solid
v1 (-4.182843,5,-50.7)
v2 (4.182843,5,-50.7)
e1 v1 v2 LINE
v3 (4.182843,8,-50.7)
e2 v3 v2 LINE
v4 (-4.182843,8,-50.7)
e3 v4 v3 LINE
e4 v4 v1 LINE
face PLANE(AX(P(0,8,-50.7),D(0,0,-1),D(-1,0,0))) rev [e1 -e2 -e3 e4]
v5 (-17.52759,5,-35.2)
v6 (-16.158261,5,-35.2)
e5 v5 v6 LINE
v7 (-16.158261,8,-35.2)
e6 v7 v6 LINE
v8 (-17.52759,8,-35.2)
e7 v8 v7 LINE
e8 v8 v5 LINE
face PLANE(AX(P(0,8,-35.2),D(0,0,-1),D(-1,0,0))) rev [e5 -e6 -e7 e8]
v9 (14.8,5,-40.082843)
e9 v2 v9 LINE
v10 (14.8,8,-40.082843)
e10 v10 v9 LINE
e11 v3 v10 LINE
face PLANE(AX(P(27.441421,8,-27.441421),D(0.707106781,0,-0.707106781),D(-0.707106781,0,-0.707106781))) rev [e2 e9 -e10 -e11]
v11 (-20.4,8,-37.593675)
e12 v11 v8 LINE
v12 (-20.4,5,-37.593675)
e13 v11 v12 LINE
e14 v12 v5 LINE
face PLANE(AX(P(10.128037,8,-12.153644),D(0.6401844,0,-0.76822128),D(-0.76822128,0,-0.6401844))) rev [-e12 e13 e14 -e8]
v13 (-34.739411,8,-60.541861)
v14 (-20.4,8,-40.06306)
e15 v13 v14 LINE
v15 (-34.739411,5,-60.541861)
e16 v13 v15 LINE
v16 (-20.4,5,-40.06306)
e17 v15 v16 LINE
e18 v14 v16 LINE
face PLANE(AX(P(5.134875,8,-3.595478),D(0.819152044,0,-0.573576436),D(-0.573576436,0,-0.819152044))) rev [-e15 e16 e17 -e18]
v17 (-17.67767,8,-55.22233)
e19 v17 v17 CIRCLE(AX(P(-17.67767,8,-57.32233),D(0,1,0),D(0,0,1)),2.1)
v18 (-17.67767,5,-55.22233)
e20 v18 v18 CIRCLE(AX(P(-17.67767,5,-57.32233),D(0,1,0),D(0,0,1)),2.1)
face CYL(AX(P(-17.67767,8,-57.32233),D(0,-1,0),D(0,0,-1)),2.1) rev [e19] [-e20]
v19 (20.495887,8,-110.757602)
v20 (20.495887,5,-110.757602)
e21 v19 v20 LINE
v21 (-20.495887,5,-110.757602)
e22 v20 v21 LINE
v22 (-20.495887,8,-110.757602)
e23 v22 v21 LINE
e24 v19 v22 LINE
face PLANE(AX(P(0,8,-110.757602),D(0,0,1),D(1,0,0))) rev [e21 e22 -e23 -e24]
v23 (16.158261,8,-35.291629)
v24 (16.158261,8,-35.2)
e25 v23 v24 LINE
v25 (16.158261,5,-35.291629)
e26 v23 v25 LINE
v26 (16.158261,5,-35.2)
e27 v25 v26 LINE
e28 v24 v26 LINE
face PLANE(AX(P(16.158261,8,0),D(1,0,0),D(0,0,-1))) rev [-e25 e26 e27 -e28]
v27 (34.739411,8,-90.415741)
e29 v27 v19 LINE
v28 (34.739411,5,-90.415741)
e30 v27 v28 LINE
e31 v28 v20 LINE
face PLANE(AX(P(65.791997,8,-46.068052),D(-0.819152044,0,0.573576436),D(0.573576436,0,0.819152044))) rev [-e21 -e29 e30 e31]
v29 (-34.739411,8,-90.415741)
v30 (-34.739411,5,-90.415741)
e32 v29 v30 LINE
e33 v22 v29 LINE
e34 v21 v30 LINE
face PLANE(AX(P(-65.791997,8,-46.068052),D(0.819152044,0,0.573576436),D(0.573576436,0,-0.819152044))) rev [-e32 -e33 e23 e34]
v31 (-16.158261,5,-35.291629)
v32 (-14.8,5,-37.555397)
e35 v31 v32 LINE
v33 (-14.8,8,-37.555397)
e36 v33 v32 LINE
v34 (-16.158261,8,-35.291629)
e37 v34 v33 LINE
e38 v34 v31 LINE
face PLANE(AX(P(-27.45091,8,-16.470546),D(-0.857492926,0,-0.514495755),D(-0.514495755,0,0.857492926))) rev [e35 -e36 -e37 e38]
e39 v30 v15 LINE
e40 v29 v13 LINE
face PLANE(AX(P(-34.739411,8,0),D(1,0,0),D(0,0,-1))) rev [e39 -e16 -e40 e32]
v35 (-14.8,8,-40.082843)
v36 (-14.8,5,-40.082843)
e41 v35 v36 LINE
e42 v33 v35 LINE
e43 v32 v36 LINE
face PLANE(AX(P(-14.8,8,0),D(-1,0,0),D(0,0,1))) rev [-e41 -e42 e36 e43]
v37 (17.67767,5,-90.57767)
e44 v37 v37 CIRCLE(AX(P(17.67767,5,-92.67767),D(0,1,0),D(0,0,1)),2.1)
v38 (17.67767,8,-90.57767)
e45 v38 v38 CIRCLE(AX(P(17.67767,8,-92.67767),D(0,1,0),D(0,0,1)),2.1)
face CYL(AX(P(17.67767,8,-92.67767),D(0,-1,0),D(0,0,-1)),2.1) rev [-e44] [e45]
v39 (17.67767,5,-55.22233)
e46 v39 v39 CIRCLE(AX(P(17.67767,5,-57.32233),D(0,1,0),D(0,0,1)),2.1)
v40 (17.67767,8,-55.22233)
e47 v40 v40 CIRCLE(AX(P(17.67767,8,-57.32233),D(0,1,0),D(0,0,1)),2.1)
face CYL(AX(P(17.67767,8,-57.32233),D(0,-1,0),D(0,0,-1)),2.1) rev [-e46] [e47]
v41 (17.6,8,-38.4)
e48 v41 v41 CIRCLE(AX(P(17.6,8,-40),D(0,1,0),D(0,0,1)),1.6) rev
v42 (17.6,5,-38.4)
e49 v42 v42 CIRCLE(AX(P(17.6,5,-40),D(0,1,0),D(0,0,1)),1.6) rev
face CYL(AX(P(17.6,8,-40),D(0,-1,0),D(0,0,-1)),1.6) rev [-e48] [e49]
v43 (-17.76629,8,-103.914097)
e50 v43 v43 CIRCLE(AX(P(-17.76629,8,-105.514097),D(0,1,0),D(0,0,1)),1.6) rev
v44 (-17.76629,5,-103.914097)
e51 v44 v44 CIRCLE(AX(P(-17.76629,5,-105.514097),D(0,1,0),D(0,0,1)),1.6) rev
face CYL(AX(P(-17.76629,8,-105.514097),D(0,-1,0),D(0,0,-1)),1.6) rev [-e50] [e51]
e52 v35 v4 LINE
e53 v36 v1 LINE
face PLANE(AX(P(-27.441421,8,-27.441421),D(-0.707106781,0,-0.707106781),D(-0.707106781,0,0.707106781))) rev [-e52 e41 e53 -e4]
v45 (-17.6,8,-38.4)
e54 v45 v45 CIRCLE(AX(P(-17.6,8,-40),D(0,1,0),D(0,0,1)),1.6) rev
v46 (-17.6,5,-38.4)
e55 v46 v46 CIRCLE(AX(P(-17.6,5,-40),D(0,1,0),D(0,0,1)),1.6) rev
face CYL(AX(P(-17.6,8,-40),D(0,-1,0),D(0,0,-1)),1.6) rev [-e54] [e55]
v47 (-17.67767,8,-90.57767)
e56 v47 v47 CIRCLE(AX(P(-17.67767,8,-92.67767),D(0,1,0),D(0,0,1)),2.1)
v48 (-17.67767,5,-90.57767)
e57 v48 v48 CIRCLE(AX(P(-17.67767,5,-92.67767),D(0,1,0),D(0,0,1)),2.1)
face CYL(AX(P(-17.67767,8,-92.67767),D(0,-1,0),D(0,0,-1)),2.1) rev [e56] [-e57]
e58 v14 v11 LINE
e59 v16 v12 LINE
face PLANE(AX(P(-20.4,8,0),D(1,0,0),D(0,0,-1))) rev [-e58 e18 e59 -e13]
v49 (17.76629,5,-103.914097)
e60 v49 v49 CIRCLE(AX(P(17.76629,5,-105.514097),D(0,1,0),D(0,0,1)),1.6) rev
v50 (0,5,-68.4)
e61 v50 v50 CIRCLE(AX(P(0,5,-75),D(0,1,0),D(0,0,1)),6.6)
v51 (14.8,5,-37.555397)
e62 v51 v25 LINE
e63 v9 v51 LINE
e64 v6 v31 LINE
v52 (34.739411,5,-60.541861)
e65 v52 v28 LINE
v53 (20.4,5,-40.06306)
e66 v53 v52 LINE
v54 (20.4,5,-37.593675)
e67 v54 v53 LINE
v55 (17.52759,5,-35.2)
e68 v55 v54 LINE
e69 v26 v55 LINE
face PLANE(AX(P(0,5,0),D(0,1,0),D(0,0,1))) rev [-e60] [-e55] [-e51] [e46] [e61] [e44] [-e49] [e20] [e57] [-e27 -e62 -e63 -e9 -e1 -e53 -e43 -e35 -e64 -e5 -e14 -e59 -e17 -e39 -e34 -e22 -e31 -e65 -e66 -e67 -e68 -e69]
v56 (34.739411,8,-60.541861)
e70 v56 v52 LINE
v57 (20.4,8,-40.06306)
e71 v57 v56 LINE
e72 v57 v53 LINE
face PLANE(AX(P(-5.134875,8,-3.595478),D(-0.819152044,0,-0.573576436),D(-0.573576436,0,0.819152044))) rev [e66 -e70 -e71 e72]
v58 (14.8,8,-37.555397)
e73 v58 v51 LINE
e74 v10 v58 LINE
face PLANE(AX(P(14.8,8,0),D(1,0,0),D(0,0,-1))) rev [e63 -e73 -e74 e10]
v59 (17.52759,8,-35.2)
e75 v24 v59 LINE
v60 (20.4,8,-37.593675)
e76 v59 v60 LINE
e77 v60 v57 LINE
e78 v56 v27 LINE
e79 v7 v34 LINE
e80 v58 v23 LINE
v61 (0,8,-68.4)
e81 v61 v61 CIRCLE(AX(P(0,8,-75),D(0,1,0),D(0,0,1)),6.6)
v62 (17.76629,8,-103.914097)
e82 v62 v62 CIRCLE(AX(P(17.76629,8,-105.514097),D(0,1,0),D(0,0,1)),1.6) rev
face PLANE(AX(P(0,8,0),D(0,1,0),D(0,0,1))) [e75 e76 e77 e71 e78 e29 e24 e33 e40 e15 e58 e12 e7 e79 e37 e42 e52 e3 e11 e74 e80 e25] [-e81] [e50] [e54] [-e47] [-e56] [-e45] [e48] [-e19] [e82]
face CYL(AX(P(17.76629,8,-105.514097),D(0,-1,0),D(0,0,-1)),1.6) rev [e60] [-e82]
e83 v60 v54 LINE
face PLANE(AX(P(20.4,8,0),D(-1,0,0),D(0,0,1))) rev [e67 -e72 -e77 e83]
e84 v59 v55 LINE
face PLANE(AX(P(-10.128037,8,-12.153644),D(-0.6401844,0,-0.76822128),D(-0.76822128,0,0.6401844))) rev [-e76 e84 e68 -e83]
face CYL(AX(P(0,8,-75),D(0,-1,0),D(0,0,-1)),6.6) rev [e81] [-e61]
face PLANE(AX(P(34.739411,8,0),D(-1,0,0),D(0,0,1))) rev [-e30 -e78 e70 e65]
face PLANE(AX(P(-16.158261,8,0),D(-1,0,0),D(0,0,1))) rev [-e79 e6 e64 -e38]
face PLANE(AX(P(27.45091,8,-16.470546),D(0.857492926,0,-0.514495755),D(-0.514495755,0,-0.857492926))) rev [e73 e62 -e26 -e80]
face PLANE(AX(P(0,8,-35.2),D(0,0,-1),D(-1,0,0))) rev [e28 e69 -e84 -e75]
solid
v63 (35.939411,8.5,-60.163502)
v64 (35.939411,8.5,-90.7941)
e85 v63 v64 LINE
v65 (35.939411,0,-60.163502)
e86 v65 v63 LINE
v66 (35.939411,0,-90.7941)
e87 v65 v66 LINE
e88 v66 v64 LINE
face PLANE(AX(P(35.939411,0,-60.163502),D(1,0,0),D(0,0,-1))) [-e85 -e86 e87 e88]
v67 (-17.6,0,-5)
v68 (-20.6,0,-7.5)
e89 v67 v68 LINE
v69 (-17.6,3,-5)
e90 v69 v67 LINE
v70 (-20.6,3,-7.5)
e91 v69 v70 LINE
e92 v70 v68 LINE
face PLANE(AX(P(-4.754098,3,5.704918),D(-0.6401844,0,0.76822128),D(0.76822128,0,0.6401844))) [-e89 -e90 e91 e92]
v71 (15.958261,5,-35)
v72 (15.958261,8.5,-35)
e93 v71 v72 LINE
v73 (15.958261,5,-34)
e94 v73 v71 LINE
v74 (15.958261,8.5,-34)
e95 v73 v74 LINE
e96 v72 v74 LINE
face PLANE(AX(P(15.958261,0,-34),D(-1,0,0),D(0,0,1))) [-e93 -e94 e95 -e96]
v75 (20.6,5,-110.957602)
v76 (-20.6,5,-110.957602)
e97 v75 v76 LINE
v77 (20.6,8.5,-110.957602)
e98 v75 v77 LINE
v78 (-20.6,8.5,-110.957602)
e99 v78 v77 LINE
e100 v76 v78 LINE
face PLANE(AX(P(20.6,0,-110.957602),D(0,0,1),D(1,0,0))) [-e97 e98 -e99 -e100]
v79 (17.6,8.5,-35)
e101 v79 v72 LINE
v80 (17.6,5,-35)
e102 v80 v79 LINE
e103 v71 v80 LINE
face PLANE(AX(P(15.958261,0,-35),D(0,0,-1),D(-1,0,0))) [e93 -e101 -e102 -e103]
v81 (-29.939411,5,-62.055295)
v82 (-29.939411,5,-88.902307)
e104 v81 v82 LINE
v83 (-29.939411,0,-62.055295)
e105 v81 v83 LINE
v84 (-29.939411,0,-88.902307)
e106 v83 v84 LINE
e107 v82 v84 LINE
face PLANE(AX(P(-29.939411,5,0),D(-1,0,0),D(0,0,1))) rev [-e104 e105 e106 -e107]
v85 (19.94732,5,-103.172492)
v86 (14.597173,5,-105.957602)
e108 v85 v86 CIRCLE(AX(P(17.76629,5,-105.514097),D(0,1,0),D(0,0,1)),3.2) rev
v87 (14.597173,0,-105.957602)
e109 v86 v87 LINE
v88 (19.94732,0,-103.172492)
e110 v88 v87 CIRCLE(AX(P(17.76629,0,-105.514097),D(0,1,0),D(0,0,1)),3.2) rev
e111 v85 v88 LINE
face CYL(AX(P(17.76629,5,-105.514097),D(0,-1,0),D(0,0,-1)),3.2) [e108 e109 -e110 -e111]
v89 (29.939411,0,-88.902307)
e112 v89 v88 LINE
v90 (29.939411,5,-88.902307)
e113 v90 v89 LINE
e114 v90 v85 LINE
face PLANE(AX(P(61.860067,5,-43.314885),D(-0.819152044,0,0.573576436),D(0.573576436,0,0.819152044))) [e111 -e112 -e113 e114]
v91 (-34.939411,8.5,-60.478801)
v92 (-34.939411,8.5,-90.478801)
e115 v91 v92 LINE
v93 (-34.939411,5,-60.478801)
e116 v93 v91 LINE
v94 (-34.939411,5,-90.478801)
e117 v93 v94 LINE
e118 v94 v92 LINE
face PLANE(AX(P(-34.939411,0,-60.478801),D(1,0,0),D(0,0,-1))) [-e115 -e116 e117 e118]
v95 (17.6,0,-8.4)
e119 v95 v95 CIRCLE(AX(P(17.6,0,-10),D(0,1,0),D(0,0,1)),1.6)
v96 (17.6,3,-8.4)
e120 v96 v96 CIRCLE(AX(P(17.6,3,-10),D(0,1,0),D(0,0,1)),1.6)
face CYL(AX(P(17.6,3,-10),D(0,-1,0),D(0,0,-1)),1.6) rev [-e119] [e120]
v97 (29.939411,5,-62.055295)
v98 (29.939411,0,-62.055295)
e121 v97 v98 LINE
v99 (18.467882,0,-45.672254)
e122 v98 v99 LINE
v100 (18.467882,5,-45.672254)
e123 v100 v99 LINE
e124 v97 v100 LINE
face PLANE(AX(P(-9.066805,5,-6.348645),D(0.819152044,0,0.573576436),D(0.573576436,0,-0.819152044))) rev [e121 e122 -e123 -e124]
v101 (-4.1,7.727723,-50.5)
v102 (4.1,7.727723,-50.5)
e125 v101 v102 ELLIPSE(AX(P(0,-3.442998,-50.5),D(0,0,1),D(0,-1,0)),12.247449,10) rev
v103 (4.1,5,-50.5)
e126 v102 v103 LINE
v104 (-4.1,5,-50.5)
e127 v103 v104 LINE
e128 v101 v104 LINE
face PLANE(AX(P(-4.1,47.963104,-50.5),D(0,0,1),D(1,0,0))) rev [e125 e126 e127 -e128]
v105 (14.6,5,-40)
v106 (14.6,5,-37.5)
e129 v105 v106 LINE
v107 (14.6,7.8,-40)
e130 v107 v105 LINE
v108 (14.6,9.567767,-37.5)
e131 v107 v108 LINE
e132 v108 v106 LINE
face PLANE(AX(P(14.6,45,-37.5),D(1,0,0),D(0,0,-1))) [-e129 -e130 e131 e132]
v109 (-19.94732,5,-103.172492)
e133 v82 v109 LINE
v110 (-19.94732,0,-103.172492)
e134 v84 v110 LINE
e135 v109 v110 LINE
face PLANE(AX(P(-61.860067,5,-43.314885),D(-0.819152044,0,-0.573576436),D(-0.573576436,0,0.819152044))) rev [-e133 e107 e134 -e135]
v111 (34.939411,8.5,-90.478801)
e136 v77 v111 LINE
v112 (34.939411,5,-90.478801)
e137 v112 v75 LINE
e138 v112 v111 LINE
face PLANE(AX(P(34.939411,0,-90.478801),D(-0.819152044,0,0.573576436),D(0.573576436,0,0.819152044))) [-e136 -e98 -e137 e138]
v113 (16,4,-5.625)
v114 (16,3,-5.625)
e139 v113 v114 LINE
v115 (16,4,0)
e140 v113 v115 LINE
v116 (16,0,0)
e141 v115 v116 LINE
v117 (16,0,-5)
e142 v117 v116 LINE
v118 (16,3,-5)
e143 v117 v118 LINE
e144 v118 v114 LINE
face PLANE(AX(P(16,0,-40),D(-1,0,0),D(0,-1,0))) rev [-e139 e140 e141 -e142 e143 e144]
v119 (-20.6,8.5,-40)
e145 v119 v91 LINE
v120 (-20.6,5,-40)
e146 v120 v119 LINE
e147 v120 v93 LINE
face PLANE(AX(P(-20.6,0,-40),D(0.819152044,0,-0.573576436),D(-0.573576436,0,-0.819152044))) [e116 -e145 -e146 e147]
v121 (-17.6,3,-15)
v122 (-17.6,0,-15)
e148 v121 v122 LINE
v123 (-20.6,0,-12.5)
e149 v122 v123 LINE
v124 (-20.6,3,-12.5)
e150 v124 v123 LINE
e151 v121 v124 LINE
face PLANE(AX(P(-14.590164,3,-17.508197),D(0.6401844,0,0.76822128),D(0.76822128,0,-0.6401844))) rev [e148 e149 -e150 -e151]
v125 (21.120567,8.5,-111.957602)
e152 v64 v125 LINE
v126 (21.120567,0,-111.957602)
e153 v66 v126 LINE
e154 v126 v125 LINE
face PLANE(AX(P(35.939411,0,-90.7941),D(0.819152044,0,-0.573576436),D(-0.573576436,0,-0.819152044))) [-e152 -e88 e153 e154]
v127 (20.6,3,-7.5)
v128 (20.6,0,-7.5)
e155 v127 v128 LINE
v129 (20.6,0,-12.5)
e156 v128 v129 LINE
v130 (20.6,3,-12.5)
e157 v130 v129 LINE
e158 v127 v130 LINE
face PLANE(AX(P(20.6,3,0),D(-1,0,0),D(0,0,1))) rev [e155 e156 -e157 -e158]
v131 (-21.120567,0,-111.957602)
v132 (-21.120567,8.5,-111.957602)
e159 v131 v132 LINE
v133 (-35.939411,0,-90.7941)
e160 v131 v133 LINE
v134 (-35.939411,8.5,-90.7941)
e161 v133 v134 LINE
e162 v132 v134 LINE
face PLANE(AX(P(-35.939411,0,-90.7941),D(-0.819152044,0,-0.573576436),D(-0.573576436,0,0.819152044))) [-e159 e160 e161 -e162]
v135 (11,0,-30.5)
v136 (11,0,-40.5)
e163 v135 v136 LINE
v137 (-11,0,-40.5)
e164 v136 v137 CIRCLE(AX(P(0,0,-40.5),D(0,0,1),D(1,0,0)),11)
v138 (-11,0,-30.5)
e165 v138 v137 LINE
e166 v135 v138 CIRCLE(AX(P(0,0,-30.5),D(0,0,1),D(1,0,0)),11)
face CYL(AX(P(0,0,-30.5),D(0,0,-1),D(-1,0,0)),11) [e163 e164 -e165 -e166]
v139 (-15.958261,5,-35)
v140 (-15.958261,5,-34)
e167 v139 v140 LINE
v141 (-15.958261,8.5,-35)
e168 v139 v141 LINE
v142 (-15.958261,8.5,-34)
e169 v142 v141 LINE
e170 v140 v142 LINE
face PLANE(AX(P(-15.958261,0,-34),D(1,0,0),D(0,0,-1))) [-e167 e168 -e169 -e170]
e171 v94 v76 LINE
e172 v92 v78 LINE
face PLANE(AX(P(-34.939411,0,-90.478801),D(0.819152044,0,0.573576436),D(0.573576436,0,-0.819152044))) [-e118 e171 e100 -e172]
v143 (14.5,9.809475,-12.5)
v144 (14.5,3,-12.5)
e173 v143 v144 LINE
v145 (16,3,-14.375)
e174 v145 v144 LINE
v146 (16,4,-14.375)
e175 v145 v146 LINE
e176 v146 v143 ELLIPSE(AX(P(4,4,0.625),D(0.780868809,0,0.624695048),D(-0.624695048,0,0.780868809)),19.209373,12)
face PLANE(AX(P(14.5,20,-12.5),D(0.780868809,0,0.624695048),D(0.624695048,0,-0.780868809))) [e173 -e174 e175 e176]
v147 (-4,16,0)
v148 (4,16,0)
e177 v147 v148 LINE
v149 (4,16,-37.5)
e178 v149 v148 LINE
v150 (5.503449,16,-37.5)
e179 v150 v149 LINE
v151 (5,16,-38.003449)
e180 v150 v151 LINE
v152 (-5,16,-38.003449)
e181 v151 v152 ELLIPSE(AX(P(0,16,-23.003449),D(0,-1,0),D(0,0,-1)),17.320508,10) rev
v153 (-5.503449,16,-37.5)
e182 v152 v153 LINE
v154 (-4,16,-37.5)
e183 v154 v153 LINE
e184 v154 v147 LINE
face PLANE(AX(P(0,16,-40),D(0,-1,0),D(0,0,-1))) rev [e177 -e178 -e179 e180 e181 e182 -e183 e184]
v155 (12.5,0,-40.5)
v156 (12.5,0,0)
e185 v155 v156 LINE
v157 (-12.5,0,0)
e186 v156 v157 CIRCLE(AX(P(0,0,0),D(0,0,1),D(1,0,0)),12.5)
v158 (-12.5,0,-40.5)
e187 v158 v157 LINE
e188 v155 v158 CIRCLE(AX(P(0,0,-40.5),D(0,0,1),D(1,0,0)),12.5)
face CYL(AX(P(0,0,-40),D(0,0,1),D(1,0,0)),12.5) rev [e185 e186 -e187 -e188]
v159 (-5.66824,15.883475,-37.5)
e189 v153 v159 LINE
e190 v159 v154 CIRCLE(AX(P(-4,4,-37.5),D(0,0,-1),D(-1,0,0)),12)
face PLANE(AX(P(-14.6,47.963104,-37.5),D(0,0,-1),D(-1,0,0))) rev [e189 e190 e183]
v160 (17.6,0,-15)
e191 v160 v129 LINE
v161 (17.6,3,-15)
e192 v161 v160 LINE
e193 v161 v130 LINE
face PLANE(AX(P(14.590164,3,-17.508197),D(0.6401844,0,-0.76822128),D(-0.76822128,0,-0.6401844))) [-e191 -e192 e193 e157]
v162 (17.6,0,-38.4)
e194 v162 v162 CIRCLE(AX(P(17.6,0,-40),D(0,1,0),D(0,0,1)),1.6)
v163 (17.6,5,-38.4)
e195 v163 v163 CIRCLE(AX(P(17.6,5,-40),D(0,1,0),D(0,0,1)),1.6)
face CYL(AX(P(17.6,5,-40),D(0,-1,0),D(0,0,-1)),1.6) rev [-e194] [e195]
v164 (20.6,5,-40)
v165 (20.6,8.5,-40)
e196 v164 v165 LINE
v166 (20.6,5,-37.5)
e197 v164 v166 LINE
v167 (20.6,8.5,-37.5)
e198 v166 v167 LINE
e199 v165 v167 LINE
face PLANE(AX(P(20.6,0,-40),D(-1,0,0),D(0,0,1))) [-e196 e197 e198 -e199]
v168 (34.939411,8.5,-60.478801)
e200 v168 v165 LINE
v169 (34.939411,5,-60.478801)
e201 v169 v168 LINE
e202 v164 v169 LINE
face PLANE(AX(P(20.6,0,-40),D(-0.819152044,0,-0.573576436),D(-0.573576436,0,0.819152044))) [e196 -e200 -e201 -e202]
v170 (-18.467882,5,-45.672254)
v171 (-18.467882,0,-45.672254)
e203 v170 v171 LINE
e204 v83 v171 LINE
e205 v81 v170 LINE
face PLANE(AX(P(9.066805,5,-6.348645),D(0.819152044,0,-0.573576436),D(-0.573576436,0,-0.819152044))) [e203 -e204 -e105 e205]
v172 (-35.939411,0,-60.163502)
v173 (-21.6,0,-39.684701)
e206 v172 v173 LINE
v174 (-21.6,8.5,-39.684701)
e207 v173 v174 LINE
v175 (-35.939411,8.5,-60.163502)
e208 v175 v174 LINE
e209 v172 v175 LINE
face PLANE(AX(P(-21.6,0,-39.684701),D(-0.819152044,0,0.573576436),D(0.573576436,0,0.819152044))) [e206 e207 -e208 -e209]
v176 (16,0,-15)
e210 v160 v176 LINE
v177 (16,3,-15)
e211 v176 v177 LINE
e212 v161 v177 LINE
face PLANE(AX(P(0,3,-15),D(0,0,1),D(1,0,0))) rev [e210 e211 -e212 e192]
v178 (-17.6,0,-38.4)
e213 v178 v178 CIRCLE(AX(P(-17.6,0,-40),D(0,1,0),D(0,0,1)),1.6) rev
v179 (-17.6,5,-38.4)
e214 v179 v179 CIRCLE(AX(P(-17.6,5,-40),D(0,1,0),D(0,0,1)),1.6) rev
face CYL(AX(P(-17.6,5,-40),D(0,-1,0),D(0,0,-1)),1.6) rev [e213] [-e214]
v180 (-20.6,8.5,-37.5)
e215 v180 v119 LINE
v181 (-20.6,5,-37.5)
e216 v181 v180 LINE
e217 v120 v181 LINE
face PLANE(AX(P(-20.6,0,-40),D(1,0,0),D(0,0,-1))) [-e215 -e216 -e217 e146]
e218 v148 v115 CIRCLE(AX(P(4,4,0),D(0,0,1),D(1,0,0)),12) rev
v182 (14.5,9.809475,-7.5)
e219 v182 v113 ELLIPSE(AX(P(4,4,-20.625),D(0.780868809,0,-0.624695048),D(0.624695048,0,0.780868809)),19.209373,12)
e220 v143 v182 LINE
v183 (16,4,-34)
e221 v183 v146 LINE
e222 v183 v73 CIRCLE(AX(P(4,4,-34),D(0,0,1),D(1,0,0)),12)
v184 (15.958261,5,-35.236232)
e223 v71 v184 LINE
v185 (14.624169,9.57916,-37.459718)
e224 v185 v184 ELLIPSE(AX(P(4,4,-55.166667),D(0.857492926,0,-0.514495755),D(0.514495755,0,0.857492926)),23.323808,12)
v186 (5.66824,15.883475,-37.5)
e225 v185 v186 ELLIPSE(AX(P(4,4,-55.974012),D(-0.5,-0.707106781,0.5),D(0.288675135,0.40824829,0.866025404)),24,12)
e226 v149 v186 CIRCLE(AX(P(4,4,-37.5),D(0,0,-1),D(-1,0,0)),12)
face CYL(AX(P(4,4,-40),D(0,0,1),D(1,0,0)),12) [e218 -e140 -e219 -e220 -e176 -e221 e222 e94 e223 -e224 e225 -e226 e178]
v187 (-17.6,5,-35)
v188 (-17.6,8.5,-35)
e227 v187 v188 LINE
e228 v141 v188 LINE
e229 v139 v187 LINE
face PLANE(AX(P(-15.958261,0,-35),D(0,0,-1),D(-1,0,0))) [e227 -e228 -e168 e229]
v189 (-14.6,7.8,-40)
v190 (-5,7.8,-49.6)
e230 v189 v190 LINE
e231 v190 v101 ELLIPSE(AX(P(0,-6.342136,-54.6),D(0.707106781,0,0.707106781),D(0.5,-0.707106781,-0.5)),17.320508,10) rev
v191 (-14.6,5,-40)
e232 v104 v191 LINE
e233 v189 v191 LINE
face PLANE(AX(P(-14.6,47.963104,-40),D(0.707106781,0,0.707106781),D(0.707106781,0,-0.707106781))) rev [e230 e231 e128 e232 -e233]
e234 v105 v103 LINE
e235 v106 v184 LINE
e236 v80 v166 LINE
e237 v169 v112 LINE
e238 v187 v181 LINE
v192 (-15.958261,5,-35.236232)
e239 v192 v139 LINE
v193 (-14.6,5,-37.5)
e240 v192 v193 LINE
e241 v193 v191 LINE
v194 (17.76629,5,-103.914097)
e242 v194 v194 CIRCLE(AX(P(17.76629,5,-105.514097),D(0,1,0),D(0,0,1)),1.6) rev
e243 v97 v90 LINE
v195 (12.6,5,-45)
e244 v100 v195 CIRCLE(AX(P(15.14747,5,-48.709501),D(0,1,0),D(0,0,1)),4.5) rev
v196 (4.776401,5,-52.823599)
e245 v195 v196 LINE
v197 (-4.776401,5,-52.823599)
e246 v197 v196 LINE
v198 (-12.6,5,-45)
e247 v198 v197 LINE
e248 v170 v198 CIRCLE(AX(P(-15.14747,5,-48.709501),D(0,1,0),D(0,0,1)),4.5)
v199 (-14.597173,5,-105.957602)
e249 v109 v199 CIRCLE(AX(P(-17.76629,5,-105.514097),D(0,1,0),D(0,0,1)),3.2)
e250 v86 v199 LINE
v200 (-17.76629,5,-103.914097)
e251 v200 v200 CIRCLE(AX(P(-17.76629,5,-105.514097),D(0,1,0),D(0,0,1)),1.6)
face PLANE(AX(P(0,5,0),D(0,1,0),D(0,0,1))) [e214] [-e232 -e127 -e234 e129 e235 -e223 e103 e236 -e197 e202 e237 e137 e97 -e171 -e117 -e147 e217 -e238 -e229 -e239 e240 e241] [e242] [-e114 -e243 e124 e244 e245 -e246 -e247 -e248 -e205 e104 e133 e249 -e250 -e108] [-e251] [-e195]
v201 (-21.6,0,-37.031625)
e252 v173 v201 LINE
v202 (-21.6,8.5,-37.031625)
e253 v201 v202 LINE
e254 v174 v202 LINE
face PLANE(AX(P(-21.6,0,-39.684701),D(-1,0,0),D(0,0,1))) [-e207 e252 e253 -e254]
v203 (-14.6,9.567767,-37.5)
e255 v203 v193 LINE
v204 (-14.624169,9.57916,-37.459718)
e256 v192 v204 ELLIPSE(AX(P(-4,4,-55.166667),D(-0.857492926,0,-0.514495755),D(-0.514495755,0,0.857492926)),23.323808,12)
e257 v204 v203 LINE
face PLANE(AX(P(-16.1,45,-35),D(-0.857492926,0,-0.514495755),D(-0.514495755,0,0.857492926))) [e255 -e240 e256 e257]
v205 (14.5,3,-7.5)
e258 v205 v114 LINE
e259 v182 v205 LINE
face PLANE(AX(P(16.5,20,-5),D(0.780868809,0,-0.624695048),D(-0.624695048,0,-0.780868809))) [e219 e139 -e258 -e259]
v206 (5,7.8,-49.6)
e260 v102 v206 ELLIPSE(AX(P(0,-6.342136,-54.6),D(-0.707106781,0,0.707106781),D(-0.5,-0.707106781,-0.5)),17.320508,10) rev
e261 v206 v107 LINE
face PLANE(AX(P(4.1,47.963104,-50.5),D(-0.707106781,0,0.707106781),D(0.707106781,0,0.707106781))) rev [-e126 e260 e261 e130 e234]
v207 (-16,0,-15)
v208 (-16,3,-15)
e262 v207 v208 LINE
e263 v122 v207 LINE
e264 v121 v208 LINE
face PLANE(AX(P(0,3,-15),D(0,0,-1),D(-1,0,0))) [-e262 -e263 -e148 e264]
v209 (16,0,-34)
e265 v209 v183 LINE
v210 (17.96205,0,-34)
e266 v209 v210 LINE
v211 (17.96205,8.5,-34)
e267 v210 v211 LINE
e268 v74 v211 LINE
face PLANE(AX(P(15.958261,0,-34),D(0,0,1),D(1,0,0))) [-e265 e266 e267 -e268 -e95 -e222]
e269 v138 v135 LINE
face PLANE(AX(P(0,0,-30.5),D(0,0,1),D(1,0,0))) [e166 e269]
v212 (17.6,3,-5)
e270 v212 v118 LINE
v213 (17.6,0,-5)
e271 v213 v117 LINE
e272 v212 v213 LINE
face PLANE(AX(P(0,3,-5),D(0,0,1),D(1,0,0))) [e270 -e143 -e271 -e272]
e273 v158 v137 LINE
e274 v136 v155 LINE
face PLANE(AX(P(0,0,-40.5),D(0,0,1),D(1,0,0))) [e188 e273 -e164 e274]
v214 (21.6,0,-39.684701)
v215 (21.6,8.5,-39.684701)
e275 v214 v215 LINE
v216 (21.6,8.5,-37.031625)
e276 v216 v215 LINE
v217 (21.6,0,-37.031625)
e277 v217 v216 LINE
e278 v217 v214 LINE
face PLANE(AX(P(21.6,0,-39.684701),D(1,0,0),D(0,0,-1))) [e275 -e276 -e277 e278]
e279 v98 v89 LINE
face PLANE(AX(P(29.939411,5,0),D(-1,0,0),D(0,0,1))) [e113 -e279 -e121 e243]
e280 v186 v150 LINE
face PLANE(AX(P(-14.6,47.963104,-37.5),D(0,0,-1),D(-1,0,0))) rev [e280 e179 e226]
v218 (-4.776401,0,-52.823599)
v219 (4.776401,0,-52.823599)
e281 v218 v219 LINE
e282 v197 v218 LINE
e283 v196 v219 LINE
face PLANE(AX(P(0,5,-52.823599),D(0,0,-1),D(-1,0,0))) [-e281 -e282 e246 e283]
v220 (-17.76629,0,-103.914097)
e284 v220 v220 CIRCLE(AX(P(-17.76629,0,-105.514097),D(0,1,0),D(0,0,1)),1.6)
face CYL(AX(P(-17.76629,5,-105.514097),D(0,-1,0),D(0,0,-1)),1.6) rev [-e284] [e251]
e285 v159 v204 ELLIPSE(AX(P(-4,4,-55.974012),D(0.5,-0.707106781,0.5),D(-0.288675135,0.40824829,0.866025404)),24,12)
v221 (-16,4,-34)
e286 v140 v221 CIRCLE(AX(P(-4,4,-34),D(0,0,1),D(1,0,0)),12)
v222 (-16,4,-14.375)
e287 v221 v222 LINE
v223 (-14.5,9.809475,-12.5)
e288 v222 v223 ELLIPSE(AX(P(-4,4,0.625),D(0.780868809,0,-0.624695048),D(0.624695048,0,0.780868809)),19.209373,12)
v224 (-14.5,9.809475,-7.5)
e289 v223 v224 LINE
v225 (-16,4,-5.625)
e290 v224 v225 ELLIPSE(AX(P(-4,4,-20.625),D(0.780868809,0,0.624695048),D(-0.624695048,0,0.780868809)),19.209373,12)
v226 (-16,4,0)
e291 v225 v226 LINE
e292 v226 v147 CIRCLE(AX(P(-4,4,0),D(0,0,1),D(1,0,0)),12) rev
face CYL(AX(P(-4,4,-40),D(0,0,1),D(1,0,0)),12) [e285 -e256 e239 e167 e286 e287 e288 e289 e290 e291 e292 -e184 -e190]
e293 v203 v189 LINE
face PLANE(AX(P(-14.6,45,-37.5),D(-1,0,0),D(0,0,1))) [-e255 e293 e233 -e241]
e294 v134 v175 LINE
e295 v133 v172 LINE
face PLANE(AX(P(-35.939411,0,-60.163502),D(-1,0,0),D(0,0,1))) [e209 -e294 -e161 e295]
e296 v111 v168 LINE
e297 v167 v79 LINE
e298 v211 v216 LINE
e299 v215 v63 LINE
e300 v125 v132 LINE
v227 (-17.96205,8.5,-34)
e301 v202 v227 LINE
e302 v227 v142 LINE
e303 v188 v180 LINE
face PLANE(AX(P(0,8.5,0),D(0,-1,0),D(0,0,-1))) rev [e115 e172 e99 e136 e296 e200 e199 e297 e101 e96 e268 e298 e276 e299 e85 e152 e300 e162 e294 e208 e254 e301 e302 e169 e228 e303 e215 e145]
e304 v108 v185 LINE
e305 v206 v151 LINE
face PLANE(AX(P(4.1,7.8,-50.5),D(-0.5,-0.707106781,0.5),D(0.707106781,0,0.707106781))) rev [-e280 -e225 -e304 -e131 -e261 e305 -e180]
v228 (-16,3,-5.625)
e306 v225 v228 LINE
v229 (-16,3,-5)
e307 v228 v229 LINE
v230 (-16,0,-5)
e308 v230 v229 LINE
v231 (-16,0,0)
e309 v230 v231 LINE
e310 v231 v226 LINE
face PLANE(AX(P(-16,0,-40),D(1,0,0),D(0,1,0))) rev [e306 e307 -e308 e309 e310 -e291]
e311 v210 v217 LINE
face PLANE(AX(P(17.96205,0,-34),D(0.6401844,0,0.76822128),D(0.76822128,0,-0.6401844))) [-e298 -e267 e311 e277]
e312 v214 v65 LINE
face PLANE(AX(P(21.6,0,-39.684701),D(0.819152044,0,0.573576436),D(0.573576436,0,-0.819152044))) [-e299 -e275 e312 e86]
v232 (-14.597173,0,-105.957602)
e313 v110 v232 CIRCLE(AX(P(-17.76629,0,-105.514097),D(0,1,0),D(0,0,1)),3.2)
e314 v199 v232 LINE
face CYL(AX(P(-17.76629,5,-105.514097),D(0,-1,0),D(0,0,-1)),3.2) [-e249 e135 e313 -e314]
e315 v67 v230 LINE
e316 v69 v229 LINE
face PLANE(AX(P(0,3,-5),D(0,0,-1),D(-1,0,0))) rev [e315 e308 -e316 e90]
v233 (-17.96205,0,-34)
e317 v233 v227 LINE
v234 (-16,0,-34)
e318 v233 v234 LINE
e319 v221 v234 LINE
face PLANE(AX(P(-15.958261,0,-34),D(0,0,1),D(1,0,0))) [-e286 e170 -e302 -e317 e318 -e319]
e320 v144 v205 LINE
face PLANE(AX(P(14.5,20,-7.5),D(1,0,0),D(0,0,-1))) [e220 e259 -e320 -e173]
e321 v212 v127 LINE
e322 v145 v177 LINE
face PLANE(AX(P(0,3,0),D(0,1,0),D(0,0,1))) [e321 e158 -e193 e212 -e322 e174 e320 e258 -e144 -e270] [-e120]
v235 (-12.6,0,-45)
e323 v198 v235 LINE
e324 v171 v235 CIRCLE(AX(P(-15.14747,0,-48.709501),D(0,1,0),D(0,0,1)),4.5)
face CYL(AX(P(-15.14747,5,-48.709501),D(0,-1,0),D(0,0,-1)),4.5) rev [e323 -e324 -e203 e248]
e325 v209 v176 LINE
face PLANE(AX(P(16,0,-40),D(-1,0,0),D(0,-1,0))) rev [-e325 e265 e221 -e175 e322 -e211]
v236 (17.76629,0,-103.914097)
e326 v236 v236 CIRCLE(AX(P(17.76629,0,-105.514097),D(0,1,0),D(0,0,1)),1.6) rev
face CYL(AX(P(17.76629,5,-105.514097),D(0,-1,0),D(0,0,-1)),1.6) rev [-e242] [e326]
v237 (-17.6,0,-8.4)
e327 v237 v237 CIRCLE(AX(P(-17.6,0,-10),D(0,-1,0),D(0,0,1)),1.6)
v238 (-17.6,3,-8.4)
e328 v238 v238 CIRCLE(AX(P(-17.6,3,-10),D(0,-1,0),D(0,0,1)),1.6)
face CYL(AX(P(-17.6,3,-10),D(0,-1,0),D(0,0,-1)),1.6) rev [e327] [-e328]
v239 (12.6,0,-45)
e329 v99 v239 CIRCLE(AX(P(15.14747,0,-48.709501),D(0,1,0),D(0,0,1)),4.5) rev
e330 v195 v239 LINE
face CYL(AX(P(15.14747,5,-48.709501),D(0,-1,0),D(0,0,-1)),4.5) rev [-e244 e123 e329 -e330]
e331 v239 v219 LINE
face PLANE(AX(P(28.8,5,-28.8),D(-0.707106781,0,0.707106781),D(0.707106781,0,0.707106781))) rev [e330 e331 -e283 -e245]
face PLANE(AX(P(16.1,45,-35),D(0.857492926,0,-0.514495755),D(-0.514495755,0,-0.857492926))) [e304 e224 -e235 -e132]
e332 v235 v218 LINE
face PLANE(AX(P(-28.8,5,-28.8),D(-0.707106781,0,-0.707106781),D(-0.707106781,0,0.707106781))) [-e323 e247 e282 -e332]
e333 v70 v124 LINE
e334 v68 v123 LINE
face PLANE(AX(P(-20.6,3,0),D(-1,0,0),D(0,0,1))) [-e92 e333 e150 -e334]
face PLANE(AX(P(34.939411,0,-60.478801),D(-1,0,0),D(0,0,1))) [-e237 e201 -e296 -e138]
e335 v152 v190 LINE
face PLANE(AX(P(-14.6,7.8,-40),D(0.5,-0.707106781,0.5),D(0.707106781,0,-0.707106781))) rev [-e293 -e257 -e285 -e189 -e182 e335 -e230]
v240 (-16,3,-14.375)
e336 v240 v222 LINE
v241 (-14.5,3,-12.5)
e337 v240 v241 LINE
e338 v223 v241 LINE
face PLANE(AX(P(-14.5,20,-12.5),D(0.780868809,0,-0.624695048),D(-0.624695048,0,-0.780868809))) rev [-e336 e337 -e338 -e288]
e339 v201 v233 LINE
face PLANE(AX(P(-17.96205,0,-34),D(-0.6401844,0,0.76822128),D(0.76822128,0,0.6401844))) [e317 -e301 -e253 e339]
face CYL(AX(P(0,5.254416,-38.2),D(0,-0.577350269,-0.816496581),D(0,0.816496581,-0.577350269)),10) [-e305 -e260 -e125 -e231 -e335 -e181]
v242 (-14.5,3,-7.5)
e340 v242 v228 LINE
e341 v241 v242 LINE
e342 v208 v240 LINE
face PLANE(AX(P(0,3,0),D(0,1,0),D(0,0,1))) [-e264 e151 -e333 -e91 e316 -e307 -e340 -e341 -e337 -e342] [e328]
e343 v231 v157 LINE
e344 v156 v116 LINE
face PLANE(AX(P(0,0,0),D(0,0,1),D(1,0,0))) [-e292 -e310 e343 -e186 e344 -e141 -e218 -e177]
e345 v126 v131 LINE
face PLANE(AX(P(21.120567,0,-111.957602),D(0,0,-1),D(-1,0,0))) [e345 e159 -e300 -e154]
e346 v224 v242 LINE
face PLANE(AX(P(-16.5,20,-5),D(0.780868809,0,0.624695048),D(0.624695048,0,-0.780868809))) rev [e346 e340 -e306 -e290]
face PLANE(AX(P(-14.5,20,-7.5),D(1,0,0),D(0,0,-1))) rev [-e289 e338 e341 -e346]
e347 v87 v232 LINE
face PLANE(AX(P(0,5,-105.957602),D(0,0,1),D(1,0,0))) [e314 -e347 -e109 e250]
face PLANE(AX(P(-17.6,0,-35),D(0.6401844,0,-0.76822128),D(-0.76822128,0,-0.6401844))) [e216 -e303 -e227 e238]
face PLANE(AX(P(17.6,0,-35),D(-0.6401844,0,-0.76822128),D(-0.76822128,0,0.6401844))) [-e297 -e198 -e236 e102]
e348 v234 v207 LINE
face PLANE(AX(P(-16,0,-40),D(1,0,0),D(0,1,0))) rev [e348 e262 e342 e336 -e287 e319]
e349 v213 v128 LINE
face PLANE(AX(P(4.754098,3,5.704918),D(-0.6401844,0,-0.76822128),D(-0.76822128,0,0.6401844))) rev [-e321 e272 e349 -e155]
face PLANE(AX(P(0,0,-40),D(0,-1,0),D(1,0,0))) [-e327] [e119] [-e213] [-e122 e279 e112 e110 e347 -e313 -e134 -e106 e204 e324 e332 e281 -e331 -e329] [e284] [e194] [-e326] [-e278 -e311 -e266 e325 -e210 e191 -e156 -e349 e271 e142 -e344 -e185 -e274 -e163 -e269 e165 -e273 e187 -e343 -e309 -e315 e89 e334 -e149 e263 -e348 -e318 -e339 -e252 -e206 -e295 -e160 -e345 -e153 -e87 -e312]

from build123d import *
from build123d.topology import SkipClean

# Parameters (mm, degrees)
BOSS_EXTRUDE1_DEPTH      = 40
BOSS_EXTRUDE3_DEPTH      = 3
CUT_EXTRUDE5_DEPTH       = 17
BOSS_EXTRUDE4_OUTLINE_R  = 1.6
BOSS_EXTRUDE4_DEPTH      = 5
CUT_EXTRUDE7_DEPTH       = 40
BOSS_EXTRUDE5_DEPTH      = 11
CUT_EXTRUDE8_DEPTH       = 3
BOSS_EXTRUDE7_DEPTH      = 3.5
BOSS_EXTRUDE7_DEPTH_BACK = 5
SKETCH13_R               = 1.6
SKETCH13_R_2             = 2.1
SKETCH13_R_3             = 6.6
BOSS_EXTRUDE8_DEPTH      = 3
CHAMFER1_SIZE            = 8.2
FILLET1_R                = 10
BOSS_EXTRUDE9_DEPTH      = 10


# Read off the part's stored shape, not the designer's step: Boss-Extrude4
with BuildPart() as part:
    # Sketch1 → Boss-Extrude1 (new body)
    with BuildSketch(Plane.XY):
        with BuildLine():
            ThreePointArc((-12.5, 0), (0, 12.5), (12.5, 0))
            Line((12.5, 0), (16, 0))
            Line((16, 0), (16, 4))
            ThreePointArc((16, 4), (12.485281374, 12.485281374), (4, 16))
            Line((4, 16), (-4, 16))
            ThreePointArc((-4, 16), (-12.485281374, 12.485281374), (-16, 4))
            Line((-16, 4), (-16, 0))
            Line((-16, 0), (-12.5, 0))
        make_face()
    extrude(amount=-BOSS_EXTRUDE1_DEPTH)

    # Sketch3 → Boss-Extrude3 (add)
    with SkipClean():  # the faces are left unmerged after this step: merging them gives an invalid solid
        with BuildSketch(Plane(origin=(0, 0, 0), x_dir=(1, 0, 0), z_dir=(0, 1, 0))):
            Polygon((16, 10.000000005), (16, 6.333333333), (16, 5), (17.6, 5), (20.6, 7.5), (20.6, 12.5), (17.6, 15), (16, 15), (16, 13.666666667), align=None)
            with BuildLine():
                ThreePointArc((19.2, 10), (17.599999997, 8.4), (16, 10.000000005))
                ThreePointArc((16, 10.000000005), (17.600000003, 11.6), (19.2, 10))
            make_face(mode=Mode.SUBTRACT)
        boss_extrude3 = extrude(amount=BOSS_EXTRUDE3_DEPTH)

    # Sketch5 → Cut-Extrude5 (cut)
    with BuildSketch(Plane(origin=(0, 3, 0), x_dir=(1, 0, 0), z_dir=(0, 1, 0))):
        Polygon((14.5, 7.5), (14.5, 12.5), (16.5, 15), (16.5, 5), align=None)
    cut_extrude5 = extrude(amount=CUT_EXTRUDE5_DEPTH, mode=Mode.SUBTRACT)

    # Boss-Extrude4 outline → Boss-Extrude4 (add)
    with BuildSketch(Plane(origin=(0, 0, 0), x_dir=(1, 0, 0), z_dir=(0, 1, 0))):
        Polygon((17.6, 35), (20.6, 37.5), (20.6, 40), (34.939410909, 60.478801107), (34.939410909, 90.478801107), (20.6, 110.957602214), (-20.6, 110.957602214), (-34.939410909, 90.478801107), (-34.939410909, 60.478801107), (-20.6, 40), (-20.6, 37.5), (-17.6, 35), (-14.6, 35), (-14.6, 40), (-12.6, 40), (-12.6, 37.5), (12.6, 37.5), (12.6, 40), (14.6, 40), (14.6, 35), align=None)
        with BuildLine():
            ThreePointArc((18.467882182, 45.672254166), (15.659662761, 44.238744593), (12.6, 45))
            Line((12.6, 45), (4.77640104, 52.82359896))
            Line((4.77640104, 52.82359896), (-4.77640104, 52.82359896))
            Line((-4.77640104, 52.82359896), (-12.6, 45))
            ThreePointArc((-12.6, 45), (-15.659662761, 44.238744593), (-18.467882182, 45.672254166))
            Line((-18.467882182, 45.672254166), (-29.939410909, 62.055295052))
            Line((-29.939410909, 62.055295052), (-29.939410909, 88.902307163))
            Line((-29.939410909, 88.902307163), (-19.947319679, 103.172492335))
            ThreePointArc((-19.947319679, 103.172492335), (-16.288694878, 102.675662132), (-14.59717338, 105.957602214))
            Line((-14.59717338, 105.957602214), (14.59717338, 105.957602214))
            ThreePointArc((14.59717338, 105.957602214), (16.288694878, 102.675662132), (19.947319679, 103.172492335))
            Line((19.947319679, 103.172492335), (29.939410909, 88.902307163))
            Line((29.939410909, 88.902307163), (29.939410909, 62.055295052))
            Line((29.939410909, 62.055295052), (18.467882182, 45.672254166))
        make_face(mode=Mode.SUBTRACT)
        with Locations((17.766290441, 105.514096798)):
            Circle(BOSS_EXTRUDE4_OUTLINE_R, mode=Mode.SUBTRACT)
        with Locations((-17.766290441, 105.514096798)):
            Circle(BOSS_EXTRUDE4_OUTLINE_R, mode=Mode.SUBTRACT)
        with Locations((17.6, 40)):
            Circle(BOSS_EXTRUDE4_OUTLINE_R, mode=Mode.SUBTRACT)
        with Locations((-17.6, 40)):
            Circle(BOSS_EXTRUDE4_OUTLINE_R, mode=Mode.SUBTRACT)
    extrude(amount=BOSS_EXTRUDE4_DEPTH)

    # Sketch7 → Cut-Extrude7 (cut)
    with BuildSketch(Plane(origin=(0, 5, 0), x_dir=(1, 0, 0), z_dir=(0, 1, 0))):
        Polygon((-16.1, 35), (-14.6, 37.5), (-14.6, 40), (-16.1, 40), align=None)
        Polygon((16.1, 40), (16.1, 35), (14.6, 37.5), (14.6, 40), align=None)
    extrude(amount=CUT_EXTRUDE7_DEPTH, mode=Mode.SUBTRACT)

    # Sketch8 → Boss-Extrude5 (add)
    with BuildSketch(Plane(origin=(0, 5, 0), x_dir=(1, 0, 0), z_dir=(0, 1, 0))):
        Polygon((-14.6, 40), (-4.1, 50.5), (4.1, 50.5), (14.6, 40), (14.6, 37.5), (-14.6, 37.5), align=None)
    extrude(amount=BOSS_EXTRUDE5_DEPTH)

    # Sketch9 → Cut-Extrude8 (cut)
    with BuildSketch(Plane.XY.offset(-37.5)):
        with BuildLine():
            Line((-12.5, 0), (12.5, 0))
            ThreePointArc((12.5, 0), (0, 12.5), (-12.5, 0))
        make_face()
    extrude(amount=-CUT_EXTRUDE8_DEPTH, mode=Mode.SUBTRACT)

    # Mirror1: Boss-Extrude3 across plane
    add(boss_extrude3.mirror(Plane(origin=(0, 0, 0), x_dir=(0, 0, 1), z_dir=(1, 0, 0))))

    # Mirror2: Cut-Extrude5 across plane
    add(cut_extrude5.mirror(Plane(origin=(0, 0, 0), x_dir=(0, 0, 1), z_dir=(1, 0, 0))), mode=Mode.SUBTRACT)

    # Sketch10 → Boss-Extrude7 (add, two sides: drawn at the far end of the back side and taken through both)
    with BuildSketch(Plane(origin=(0, 5, 0), x_dir=(1, 0, 0), z_dir=(0, 1, 0)).offset(-BOSS_EXTRUDE7_DEPTH_BACK)):
        Polygon((20.6, 110.957602214), (-20.6, 110.957602214), (-34.939410909, 90.478801107), (-34.939410909, 60.478801107), (-20.6, 40), (-20.6, 37.5), (-17.6, 35), (-15.958260743, 35), (-15.958260743, 34), (-17.962049935, 34), (-21.6, 37.031625054), (-21.6, 39.684701211), (-35.939410909, 60.163502318), (-35.939410909, 90.794099896), (-21.120567051, 111.957602214), (21.120567051, 111.957602214), (35.939410909, 90.794099896), (35.939410909, 60.163502318), (21.6, 39.684701211), (21.6, 37.031625054), (17.962049935, 34), (15.958260743, 34), (15.958260743, 35), (17.6, 35), (20.6, 37.5), (20.6, 40), (34.939410909, 60.478801107), (34.939410909, 90.478801107), align=None)
    extrude(amount=BOSS_EXTRUDE7_DEPTH + BOSS_EXTRUDE7_DEPTH_BACK)

    # Chamfer1
    # the kernel refuses this chamfer: 8.2 mm, written as the material it takes off along each edge
    with BuildSketch(Plane(origin=(-29.511326735, 16, -25.088673265), x_dir=(0.7068394360706735, 0.0274958766105863, 0.7068394360706736), z_dir=(0.7071067811865477, 0, -0.7071067811865474))) as chamfer1_piece_1_section:
        Polygon((CHAMFER1_SIZE * 0.999621916911, CHAMFER1_SIZE * 0.0274958766106), (-CHAMFER1_SIZE * 0.0274958766106, CHAMFER1_SIZE * 0.999621916911), (0, 0), align=None)
    chamfer1_piece_1 = extrude(amount=57.024843408, mode=Mode.PRIVATE)
    chamfer1_piece_1 = split(chamfer1_piece_1, bisect_by=Plane(origin=(-17.047681799, 9.599219571, -34.539734833), z_dir=(0.6401843996644793, 0, -0.7682212795973764)), keep=Keep.TOP, mode=Mode.PRIVATE)
    add(chamfer1_piece_1, mode=Mode.SUBTRACT)
    with BuildSketch(Plane(origin=(-10.811326735, 16, -65.411326735), x_dir=(-0.7068394360706771, 0.027495876610586303, 0.70683943607067), z_dir=(0.707106781186544, 0, 0.7071067811865511))) as chamfer1_piece_2_section:
        Polygon((CHAMFER1_SIZE * 0.999621916911, CHAMFER1_SIZE * 0.0274958766106), (-CHAMFER1_SIZE * 0.0274958766106, CHAMFER1_SIZE * 0.999621916911), (0, 0), align=None)
    chamfer1_piece_2 = extrude(amount=57.024843408, mode=Mode.PRIVATE)
    chamfer1_piece_2 = split(chamfer1_piece_2, bisect_by=Plane(origin=(12.661566883, 15.409832757, -30.884639069), z_dir=(-0.6401843996644799, 0, -0.7682212795973759)), keep=Keep.TOP, mode=Mode.PRIVATE)
    add(chamfer1_piece_2, mode=Mode.SUBTRACT)

    # Fillet1
    fillet1_edges = [part.edges().sort_by_distance(p)[0] for p in [
        (0, 13.349568901, -46.751724394),
    ]]
    fillet(fillet1_edges, radius=FILLET1_R)

    # Sketch14 → Boss-Extrude9 (add)
    with BuildSketch(Plane.XY.offset(-40.5)):
        with BuildLine():
            ThreePointArc((11, 0), (0, 11), (-11, 0))
            Line((-11, 0), (11, 0))
        make_face()
    extrude(amount=BOSS_EXTRUDE9_DEPTH)


with BuildPart() as body_2:
    # Sketch13 → Boss-Extrude8 (new body)
    with BuildSketch(Plane(origin=(0, 5, 0), x_dir=(1, 0, 0), z_dir=(0, 1, 0))):
        Polygon((-20.49588659, 110.757602214), (-34.739410909, 90.415741349), (-34.739410909, 60.541860865), (-20.4, 40.063059758), (-20.4, 37.593674989), (-17.527590013, 35.2), (-16.158260743, 35.2), (-16.158260743, 35.291628888), (-14.8, 37.555396793), (-14.8, 40.082842712), (-4.182842712, 50.7), (4.182842712, 50.7), (14.8, 40.082842712), (14.8, 37.555396793), (16.158260743, 35.291628888), (16.158260743, 35.2), (17.527590013, 35.2), (20.4, 37.593674989), (20.4, 40.063059758), (34.739410909, 60.541860865), (34.739410909, 90.415741349), (20.49588659, 110.757602214), align=None)
        with Locations(Location((17.6, 40, 0), (0, 0, 270))):
            Circle(SKETCH13_R, mode=Mode.SUBTRACT)
        with Locations(Location((-17.6, 40, 0), (0, 0, 270))):
            Circle(SKETCH13_R, mode=Mode.SUBTRACT)
        with Locations(Location((-17.67766953, 57.32233047, 0), (0, 0, 270))):
            Circle(SKETCH13_R_2, mode=Mode.SUBTRACT)
        with Locations(Location((17.67766953, 57.32233047, 0), (0, 0, 270))):
            Circle(SKETCH13_R_2, mode=Mode.SUBTRACT)
        with Locations(Location((17.67766953, 92.67766953, 0), (0, 0, 270))):
            Circle(SKETCH13_R_2, mode=Mode.SUBTRACT)
        with Locations(Location((17.766290441, 105.514096798, 0), (0, 0, 270))):
            Circle(SKETCH13_R, mode=Mode.SUBTRACT)
        with Locations(Location((-17.766290441, 105.514096798, 0), (0, 0, 270))):
            Circle(SKETCH13_R, mode=Mode.SUBTRACT)
        with Locations(Location((-17.67766953, 92.67766953, 0), (0, 0, 270))):
            Circle(SKETCH13_R_2, mode=Mode.SUBTRACT)
        with Locations(Location((0, 75, 0), (0, 0, 270))):
            Circle(SKETCH13_R_3, mode=Mode.SUBTRACT)
    extrude(amount=BOSS_EXTRUDE8_DEPTH)


solid = Compound([part.part, body_2.part])
